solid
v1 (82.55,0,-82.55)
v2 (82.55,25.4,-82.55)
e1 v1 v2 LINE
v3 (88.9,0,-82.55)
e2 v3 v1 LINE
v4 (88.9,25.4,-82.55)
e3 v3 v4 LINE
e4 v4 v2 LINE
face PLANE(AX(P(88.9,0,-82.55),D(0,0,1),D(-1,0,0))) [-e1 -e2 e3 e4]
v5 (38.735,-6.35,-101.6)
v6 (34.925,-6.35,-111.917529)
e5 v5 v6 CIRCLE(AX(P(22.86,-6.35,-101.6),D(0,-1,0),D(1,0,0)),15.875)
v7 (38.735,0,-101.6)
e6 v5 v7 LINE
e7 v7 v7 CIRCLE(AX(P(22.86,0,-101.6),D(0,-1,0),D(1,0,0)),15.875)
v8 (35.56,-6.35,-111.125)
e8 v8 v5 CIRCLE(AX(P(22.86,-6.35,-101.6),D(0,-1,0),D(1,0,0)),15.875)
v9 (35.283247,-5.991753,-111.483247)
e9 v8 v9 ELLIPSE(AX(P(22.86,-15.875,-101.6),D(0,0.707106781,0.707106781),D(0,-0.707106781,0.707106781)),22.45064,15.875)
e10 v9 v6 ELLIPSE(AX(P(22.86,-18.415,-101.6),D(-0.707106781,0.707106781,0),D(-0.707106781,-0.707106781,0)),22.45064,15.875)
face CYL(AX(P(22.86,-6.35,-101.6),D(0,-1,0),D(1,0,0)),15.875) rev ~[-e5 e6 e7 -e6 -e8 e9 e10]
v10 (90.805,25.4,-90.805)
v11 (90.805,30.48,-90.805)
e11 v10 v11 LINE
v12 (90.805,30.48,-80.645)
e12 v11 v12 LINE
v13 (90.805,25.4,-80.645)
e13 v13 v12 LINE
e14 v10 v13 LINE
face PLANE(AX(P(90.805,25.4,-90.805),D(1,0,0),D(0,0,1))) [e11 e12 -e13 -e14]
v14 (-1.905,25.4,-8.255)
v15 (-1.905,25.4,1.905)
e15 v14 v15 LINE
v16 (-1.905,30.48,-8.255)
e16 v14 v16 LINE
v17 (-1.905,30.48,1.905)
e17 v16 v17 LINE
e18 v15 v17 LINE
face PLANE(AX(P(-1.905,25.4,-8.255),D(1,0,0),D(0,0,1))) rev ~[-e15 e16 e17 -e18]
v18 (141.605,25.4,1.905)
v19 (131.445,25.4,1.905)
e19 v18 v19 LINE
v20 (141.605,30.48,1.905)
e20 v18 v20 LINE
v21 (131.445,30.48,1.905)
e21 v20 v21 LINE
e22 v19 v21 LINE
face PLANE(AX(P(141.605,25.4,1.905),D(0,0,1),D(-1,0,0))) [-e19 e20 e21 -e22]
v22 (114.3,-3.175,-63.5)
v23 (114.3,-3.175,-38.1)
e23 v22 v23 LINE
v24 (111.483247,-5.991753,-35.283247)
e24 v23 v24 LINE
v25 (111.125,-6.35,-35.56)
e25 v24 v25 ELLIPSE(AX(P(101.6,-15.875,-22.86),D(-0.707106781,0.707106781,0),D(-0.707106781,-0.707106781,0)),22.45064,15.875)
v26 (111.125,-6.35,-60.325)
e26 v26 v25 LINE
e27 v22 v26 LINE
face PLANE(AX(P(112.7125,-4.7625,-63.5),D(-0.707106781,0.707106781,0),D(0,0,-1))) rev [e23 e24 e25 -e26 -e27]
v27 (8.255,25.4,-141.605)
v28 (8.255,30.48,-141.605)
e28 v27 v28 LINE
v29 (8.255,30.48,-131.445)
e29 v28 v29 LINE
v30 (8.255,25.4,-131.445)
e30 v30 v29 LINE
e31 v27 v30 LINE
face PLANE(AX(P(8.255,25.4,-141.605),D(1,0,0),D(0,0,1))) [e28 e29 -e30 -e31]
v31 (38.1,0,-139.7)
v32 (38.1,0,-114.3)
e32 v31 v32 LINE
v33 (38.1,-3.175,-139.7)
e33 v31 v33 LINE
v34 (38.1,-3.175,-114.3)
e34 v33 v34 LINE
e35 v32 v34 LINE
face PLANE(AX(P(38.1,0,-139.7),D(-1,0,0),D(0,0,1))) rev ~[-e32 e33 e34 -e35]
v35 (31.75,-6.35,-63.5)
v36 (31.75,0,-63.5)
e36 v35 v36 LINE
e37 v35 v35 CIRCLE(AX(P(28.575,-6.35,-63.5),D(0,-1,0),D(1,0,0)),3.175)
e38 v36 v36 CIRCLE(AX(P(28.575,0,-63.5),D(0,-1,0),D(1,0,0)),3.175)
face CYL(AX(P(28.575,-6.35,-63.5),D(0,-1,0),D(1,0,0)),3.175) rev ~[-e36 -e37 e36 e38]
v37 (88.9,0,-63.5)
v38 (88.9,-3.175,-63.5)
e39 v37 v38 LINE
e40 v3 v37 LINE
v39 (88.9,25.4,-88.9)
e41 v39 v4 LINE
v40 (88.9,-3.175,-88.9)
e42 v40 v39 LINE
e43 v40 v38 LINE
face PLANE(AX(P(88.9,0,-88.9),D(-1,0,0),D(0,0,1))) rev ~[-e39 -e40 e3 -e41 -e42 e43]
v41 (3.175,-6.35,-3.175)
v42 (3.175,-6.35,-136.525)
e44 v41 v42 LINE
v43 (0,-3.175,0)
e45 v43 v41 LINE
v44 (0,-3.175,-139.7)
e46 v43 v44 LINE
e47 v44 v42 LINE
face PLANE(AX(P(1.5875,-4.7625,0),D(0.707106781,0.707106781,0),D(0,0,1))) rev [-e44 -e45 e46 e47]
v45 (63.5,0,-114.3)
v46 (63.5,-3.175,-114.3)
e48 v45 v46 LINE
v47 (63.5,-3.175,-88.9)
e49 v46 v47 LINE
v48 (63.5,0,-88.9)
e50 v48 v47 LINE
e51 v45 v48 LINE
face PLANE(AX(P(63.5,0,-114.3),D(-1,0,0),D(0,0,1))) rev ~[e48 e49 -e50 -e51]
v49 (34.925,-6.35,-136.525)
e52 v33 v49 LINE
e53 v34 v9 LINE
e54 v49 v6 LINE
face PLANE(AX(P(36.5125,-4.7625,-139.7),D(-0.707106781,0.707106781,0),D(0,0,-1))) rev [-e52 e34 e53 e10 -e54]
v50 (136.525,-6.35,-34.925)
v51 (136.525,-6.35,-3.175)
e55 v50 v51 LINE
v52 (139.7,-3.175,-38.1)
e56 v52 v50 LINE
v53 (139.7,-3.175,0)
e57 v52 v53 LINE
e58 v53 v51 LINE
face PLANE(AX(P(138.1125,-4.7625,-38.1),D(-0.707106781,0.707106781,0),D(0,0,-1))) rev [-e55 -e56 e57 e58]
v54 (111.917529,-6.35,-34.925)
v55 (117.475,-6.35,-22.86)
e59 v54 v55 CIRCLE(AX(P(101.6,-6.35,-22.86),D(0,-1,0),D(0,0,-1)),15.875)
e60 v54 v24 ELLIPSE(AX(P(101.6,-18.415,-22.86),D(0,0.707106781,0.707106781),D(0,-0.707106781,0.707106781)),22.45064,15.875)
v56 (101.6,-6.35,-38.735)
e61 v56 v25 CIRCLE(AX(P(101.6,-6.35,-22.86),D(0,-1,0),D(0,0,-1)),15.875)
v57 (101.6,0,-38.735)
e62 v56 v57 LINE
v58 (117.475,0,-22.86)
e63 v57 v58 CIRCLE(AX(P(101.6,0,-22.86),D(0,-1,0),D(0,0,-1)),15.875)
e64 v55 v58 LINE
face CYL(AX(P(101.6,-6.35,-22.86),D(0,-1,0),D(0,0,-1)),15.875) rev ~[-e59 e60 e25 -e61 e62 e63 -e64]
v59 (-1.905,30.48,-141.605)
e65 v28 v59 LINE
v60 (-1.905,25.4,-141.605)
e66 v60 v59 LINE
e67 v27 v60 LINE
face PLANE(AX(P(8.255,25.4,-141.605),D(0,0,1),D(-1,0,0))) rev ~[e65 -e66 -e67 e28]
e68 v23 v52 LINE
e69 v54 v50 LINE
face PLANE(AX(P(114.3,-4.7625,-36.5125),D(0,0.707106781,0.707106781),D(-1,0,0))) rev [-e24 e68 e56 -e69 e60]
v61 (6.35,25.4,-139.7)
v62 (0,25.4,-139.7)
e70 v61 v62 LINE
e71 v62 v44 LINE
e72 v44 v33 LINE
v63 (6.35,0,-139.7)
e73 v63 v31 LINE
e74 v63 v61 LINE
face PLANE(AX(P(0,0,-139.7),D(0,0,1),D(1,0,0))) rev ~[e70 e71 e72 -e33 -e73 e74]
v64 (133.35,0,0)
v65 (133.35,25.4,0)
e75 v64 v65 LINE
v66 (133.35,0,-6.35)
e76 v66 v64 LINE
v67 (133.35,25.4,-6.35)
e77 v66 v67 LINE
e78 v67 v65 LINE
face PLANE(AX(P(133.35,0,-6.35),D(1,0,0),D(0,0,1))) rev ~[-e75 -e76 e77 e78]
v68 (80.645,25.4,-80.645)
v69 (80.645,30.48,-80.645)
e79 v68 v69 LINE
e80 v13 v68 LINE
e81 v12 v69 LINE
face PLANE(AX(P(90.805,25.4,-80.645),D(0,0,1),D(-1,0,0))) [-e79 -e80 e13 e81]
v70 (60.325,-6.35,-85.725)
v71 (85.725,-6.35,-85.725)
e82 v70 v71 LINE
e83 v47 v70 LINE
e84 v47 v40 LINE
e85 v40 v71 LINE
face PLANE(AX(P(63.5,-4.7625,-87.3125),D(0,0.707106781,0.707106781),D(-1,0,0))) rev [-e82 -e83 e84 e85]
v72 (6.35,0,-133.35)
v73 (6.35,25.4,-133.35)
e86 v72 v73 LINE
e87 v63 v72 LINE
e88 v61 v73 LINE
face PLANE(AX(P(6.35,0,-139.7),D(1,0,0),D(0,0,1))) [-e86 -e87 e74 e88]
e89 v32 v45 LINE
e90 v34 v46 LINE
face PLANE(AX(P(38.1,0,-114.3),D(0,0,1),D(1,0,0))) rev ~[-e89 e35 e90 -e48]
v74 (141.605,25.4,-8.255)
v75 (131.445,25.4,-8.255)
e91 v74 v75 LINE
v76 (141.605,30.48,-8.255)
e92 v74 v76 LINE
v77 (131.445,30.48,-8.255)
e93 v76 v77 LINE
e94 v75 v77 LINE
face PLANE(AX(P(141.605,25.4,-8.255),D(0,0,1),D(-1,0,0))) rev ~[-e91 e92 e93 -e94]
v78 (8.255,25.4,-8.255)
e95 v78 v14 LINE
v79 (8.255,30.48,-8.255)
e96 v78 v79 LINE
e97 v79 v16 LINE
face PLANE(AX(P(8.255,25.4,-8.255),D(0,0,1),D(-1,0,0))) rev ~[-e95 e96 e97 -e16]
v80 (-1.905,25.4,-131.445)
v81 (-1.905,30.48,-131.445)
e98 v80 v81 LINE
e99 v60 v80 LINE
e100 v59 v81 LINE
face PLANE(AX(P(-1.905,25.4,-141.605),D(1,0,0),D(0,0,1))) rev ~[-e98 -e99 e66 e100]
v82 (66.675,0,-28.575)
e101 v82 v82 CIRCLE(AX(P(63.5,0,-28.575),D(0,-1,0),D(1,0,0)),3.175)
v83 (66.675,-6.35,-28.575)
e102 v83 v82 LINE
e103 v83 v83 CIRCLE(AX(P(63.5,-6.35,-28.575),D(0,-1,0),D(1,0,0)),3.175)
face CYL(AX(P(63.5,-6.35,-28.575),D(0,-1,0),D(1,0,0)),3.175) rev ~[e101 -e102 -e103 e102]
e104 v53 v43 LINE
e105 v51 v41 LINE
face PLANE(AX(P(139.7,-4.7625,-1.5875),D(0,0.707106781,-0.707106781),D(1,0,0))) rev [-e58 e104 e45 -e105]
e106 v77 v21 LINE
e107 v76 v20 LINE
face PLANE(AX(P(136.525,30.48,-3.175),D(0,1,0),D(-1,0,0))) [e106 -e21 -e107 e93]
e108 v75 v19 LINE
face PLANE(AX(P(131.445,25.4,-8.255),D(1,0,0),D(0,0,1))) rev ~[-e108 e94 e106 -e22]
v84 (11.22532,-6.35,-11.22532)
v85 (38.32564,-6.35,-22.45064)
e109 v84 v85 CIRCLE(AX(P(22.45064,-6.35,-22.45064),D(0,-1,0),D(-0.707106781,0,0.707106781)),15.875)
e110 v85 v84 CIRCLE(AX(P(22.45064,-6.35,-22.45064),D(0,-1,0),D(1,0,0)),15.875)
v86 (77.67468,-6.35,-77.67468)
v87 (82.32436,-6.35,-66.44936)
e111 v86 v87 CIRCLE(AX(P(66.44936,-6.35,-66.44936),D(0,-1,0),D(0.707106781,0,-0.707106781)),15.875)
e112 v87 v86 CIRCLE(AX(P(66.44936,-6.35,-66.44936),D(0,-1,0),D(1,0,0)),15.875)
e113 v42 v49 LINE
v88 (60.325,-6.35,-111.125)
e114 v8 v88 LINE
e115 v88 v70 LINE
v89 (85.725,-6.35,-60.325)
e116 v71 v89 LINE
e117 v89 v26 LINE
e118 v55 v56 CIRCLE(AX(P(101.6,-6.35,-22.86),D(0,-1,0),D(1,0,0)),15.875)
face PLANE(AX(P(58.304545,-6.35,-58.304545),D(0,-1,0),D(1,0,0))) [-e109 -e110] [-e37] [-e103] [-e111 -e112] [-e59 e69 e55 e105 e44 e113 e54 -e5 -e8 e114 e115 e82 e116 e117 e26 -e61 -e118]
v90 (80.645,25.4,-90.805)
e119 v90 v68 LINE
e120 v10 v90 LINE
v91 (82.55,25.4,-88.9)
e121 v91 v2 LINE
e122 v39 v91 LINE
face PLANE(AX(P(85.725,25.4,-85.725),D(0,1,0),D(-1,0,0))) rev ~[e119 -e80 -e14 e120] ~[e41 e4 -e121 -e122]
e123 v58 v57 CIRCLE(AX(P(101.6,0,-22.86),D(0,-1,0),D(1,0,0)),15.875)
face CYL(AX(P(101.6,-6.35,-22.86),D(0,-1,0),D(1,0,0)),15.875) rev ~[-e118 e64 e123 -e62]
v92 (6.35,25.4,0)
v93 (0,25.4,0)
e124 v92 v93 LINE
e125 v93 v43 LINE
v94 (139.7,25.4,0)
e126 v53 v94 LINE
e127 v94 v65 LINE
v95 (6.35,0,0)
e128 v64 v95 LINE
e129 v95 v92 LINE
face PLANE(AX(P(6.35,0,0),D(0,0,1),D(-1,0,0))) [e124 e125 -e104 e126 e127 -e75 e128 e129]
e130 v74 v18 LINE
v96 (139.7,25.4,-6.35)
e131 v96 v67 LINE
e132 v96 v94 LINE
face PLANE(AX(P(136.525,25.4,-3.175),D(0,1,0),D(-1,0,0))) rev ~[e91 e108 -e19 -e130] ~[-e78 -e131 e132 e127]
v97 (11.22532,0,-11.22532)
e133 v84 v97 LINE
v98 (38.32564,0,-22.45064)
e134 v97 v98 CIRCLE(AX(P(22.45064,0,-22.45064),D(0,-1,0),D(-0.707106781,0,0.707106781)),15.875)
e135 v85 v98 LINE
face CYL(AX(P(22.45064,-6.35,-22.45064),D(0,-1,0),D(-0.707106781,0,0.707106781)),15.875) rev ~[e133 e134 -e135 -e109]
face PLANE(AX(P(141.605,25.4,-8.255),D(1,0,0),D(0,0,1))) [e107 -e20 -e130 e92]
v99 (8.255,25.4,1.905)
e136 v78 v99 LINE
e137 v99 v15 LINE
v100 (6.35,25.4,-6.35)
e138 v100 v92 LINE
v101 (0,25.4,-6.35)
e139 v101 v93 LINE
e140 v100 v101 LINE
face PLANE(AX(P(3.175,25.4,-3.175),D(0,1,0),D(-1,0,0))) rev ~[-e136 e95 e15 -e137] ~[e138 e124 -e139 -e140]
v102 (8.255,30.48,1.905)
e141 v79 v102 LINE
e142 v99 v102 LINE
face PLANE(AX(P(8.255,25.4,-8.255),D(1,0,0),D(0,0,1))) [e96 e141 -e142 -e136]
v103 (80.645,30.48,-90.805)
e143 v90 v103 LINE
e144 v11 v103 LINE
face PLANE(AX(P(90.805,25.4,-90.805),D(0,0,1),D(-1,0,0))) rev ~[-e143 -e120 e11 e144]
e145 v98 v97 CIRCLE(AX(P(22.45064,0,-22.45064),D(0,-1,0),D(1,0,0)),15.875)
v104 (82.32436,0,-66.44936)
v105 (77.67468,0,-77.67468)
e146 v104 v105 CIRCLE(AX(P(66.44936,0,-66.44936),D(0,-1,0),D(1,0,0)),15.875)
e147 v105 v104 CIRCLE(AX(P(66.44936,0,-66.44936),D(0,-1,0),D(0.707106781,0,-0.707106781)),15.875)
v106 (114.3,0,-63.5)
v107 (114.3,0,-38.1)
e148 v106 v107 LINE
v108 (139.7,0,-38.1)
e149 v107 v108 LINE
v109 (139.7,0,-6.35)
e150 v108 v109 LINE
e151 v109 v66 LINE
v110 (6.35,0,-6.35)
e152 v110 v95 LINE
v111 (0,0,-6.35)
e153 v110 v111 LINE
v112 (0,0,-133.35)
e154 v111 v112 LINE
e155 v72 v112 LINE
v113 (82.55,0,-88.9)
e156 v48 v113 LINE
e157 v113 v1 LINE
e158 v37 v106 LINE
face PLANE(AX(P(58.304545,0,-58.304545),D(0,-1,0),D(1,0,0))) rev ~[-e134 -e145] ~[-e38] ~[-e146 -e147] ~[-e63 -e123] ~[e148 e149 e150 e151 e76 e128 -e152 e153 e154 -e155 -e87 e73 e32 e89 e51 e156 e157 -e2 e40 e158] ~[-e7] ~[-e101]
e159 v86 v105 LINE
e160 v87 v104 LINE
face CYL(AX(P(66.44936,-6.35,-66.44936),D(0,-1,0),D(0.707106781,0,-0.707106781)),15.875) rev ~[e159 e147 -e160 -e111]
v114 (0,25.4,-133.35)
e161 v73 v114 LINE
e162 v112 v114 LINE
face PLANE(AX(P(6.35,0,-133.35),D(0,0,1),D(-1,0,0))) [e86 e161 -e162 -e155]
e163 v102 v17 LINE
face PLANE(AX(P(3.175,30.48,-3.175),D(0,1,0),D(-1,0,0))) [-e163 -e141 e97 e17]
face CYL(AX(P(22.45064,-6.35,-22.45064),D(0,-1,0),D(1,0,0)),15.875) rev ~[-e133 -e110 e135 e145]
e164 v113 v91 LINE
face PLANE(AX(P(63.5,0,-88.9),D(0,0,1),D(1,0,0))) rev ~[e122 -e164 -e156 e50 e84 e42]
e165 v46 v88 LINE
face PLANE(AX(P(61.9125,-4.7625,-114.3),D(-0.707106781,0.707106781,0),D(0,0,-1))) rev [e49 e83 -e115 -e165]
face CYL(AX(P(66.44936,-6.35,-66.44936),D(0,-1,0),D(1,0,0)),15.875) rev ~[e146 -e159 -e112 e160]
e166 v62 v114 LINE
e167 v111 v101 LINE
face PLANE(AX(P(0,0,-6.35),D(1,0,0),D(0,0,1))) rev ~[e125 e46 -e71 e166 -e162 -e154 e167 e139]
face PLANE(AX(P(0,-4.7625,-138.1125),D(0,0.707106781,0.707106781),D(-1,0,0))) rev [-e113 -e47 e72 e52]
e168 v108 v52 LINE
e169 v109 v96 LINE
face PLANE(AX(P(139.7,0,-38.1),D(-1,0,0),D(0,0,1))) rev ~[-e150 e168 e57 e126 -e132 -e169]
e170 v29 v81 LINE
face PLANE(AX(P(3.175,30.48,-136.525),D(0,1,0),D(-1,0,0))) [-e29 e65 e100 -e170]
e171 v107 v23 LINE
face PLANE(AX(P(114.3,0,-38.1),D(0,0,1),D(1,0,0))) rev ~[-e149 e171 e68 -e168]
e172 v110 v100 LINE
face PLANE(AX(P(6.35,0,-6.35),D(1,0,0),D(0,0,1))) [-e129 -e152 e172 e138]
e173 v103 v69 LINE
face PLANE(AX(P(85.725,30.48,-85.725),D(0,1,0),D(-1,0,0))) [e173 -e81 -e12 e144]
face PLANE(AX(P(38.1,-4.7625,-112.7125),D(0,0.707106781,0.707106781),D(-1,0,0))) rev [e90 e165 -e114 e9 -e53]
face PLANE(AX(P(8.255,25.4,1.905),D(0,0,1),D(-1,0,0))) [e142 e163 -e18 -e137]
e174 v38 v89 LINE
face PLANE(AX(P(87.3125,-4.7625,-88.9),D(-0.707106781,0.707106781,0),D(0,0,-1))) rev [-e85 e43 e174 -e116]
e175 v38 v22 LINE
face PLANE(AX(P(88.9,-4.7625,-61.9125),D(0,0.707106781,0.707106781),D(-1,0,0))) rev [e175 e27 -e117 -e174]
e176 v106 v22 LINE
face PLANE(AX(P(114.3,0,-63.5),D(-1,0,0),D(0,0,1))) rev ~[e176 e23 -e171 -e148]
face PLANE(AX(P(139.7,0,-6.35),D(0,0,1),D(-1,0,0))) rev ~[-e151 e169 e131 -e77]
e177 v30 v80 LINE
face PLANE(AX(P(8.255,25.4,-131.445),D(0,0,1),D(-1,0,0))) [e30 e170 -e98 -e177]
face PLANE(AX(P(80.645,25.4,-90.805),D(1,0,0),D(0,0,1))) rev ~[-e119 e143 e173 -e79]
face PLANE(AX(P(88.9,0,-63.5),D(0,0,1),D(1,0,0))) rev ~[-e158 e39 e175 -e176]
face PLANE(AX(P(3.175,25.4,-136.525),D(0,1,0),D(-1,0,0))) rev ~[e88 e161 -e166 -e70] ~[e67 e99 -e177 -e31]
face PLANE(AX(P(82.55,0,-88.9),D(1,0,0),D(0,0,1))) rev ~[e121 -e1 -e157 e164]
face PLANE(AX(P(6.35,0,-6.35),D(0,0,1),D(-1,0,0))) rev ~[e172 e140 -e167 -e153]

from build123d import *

# Parameters (mm, degrees)
F1_DEPTH  = 6.35
F3_SIZE   = 3.175
F5_W      = 6.35
F5_H      = 6.35
F6_DEPTH  = 25.4
F2_R      = 15.875
F7_DEPTH  = 25.4
F8_W      = 10.16
F8_H      = 10.16
F8_W_2    = 6.35
F8_H_2    = 6.35
F9_DEPTH  = 5.08
F10_W     = 10.16
F10_H     = 10.16
F10_W_2   = 6.35
F10_H_2   = 6.35
F11_DEPTH = 5.08
F12_W     = 10.16
F12_H     = 10.16
F12_W_2   = 6.35
F12_H_2   = 6.35
F13_DEPTH = 5.08
F14_W     = 10.16
F14_H     = 10.16
F14_W_2   = 6.35
F14_H_2   = 6.35
F15_DEPTH = 5.08
F4_R      = 3.175
F16_DEPTH = 25.4


# Not quite as in the source:
# - a feature names something its author has since deleted; it is built from what else it names


with BuildPart() as f1:
    # F0 (on Front) → F1 (new body)
    with BuildSketch(Plane.XZ):
        Polygon((139.7, 0), (0, 0), (0, -139.7), (38.1, -139.7), (38.1, -114.3), (63.5, -114.3), (63.5, -88.9), (88.9, -88.9), (88.9, -63.5), (114.3, -63.5), (114.3, -38.1), (139.7, -38.1), align=None)
    extrude(amount=F1_DEPTH)

    # F3
    f3_edges = [f1.edges().sort_by_distance(p)[0] for p in [
        (69.85, -6.35, 0),
        (0, -6.35, -69.85),
        (19.05, -6.35, -139.7),
        (38.1, -6.35, -127),
        (50.8, -6.35, -114.3),
        (63.5, -6.35, -101.6),
        (76.2, -6.35, -88.9),
        (88.9, -6.35, -76.2),
        (101.6, -6.35, -63.5),
        (114.3, -6.35, -50.8),
        (127, -6.35, -38.1),
        (139.7, -6.35, -19.05),
    ]]
    chamfer(f3_edges, length=F3_SIZE)

    # F5 (on face) → F6 (join)
    with BuildSketch(Plane(origin=(0, 0, 0), x_dir=(-1, 0, 0), z_dir=(0, 1, 0))):
        with Locations((-3.175, -3.175)):
            Rectangle(F5_W, F5_H)
        with Locations((-3.175, -136.525)):
            Rectangle(F5_W, F5_H)
        with Locations((-85.725, -85.725)):
            Rectangle(F5_W, F5_H)
        with Locations((-136.525, -3.175)):
            Rectangle(F5_W, F5_H)
    extrude(amount=F6_DEPTH)

    # F2 (on face) → F7 (cut)
    with BuildSketch(Plane.XZ.offset(6.35)):
        with BuildLine():
            ThreePointArc((117.475, -22.86), (90.3746798487, -11.6346798487), (101.6, -38.735))
            Line((101.6, -38.735), (101.6, -22.86))
            Line((101.6, -22.86), (117.475, -22.86))
        make_face()
        with BuildLine():
            Line((101.6, -22.86), (101.6, -38.735))
            ThreePointArc((101.6, -38.735), (112.8253201513, -34.0853201513), (117.475, -22.86))
            Line((117.475, -22.86), (101.6, -22.86))
        make_face()
        with BuildLine():
            ThreePointArc((82.3243596973, -66.4493596973), (51.7827721187, -60.3742602085), (77.6746798487, -77.6746798487))
            ThreePointArc((77.6746798487, -77.6746798487), (81.1159472759, -72.5244591861), (82.3243596973, -66.4493596973))
        make_face()
        with Locations((22.86, -101.6)):
            Circle(F2_R)
        with BuildLine():
            ThreePointArc((38.3256403027, -22.4506403027), (28.5257397915, -7.7840527241), (11.2253201513, -11.2253201513))
            ThreePointArc((11.2253201513, -11.2253201513), (16.3755408139, -37.1172278813), (38.3256403027, -22.4506403027))
        make_face()
    extrude(amount=-F7_DEPTH, mode=Mode.SUBTRACT)

    # F8 (on face) → F9 (join)
    with BuildSketch(Plane(origin=(0, 25.4, 0), x_dir=(-1, 0, 0), z_dir=(0, 1, 0))):
        with Locations((-3.175, -3.175)):
            Rectangle(F8_W, F8_H)
        with Locations((-3.175, -3.175)):
            Rectangle(F8_W_2, F8_H_2, mode=Mode.SUBTRACT)
        with Locations((-3.175, -3.175)):
            Rectangle(F8_W_2, F8_H_2)
    extrude(amount=F9_DEPTH)

    # F10 (on face) → F11 (join)
    with BuildSketch(Plane(origin=(0, 25.4, 0), x_dir=(-1, 0, 0), z_dir=(0, 1, 0))):
        with Locations((-136.525, -3.175)):
            Rectangle(F10_W, F10_H)
        with Locations((-136.525, -3.175)):
            Rectangle(F10_W_2, F10_H_2, mode=Mode.SUBTRACT)
        with Locations((-136.525, -3.175)):
            Rectangle(F10_W_2, F10_H_2)
    extrude(amount=F11_DEPTH)

    # F12 (on face) → F13 (join)
    with BuildSketch(Plane(origin=(0, 25.4, 0), x_dir=(-1, 0, 0), z_dir=(0, 1, 0))):
        with Locations((-85.725, -85.725)):
            Rectangle(F12_W, F12_H)
        with Locations((-85.725, -85.725)):
            Rectangle(F12_W_2, F12_H_2, mode=Mode.SUBTRACT)
        with Locations((-85.725, -85.725)):
            Rectangle(F12_W_2, F12_H_2)
    extrude(amount=F13_DEPTH)

    # F14 (on face) → F15 (join)
    with BuildSketch(Plane(origin=(0, 25.4, 0), x_dir=(-1, 0, 0), z_dir=(0, 1, 0))):
        with Locations((-3.175, -136.525)):
            Rectangle(F14_W, F14_H)
        with Locations((-3.175, -136.525)):
            Rectangle(F14_W_2, F14_H_2, mode=Mode.SUBTRACT)
        with Locations((-3.175, -136.525)):
            Rectangle(F14_W_2, F14_H_2)
    extrude(amount=F15_DEPTH)

    # F4 (on face) → F16 (cut)
    with BuildSketch(Plane.XZ.offset(6.35)):
        with Locations((63.5, -28.575)):
            Circle(F4_R)
        with Locations((28.575, -63.5)):
            Circle(F4_R)
    extrude(amount=-F16_DEPTH, mode=Mode.SUBTRACT)


solid = f1.part
